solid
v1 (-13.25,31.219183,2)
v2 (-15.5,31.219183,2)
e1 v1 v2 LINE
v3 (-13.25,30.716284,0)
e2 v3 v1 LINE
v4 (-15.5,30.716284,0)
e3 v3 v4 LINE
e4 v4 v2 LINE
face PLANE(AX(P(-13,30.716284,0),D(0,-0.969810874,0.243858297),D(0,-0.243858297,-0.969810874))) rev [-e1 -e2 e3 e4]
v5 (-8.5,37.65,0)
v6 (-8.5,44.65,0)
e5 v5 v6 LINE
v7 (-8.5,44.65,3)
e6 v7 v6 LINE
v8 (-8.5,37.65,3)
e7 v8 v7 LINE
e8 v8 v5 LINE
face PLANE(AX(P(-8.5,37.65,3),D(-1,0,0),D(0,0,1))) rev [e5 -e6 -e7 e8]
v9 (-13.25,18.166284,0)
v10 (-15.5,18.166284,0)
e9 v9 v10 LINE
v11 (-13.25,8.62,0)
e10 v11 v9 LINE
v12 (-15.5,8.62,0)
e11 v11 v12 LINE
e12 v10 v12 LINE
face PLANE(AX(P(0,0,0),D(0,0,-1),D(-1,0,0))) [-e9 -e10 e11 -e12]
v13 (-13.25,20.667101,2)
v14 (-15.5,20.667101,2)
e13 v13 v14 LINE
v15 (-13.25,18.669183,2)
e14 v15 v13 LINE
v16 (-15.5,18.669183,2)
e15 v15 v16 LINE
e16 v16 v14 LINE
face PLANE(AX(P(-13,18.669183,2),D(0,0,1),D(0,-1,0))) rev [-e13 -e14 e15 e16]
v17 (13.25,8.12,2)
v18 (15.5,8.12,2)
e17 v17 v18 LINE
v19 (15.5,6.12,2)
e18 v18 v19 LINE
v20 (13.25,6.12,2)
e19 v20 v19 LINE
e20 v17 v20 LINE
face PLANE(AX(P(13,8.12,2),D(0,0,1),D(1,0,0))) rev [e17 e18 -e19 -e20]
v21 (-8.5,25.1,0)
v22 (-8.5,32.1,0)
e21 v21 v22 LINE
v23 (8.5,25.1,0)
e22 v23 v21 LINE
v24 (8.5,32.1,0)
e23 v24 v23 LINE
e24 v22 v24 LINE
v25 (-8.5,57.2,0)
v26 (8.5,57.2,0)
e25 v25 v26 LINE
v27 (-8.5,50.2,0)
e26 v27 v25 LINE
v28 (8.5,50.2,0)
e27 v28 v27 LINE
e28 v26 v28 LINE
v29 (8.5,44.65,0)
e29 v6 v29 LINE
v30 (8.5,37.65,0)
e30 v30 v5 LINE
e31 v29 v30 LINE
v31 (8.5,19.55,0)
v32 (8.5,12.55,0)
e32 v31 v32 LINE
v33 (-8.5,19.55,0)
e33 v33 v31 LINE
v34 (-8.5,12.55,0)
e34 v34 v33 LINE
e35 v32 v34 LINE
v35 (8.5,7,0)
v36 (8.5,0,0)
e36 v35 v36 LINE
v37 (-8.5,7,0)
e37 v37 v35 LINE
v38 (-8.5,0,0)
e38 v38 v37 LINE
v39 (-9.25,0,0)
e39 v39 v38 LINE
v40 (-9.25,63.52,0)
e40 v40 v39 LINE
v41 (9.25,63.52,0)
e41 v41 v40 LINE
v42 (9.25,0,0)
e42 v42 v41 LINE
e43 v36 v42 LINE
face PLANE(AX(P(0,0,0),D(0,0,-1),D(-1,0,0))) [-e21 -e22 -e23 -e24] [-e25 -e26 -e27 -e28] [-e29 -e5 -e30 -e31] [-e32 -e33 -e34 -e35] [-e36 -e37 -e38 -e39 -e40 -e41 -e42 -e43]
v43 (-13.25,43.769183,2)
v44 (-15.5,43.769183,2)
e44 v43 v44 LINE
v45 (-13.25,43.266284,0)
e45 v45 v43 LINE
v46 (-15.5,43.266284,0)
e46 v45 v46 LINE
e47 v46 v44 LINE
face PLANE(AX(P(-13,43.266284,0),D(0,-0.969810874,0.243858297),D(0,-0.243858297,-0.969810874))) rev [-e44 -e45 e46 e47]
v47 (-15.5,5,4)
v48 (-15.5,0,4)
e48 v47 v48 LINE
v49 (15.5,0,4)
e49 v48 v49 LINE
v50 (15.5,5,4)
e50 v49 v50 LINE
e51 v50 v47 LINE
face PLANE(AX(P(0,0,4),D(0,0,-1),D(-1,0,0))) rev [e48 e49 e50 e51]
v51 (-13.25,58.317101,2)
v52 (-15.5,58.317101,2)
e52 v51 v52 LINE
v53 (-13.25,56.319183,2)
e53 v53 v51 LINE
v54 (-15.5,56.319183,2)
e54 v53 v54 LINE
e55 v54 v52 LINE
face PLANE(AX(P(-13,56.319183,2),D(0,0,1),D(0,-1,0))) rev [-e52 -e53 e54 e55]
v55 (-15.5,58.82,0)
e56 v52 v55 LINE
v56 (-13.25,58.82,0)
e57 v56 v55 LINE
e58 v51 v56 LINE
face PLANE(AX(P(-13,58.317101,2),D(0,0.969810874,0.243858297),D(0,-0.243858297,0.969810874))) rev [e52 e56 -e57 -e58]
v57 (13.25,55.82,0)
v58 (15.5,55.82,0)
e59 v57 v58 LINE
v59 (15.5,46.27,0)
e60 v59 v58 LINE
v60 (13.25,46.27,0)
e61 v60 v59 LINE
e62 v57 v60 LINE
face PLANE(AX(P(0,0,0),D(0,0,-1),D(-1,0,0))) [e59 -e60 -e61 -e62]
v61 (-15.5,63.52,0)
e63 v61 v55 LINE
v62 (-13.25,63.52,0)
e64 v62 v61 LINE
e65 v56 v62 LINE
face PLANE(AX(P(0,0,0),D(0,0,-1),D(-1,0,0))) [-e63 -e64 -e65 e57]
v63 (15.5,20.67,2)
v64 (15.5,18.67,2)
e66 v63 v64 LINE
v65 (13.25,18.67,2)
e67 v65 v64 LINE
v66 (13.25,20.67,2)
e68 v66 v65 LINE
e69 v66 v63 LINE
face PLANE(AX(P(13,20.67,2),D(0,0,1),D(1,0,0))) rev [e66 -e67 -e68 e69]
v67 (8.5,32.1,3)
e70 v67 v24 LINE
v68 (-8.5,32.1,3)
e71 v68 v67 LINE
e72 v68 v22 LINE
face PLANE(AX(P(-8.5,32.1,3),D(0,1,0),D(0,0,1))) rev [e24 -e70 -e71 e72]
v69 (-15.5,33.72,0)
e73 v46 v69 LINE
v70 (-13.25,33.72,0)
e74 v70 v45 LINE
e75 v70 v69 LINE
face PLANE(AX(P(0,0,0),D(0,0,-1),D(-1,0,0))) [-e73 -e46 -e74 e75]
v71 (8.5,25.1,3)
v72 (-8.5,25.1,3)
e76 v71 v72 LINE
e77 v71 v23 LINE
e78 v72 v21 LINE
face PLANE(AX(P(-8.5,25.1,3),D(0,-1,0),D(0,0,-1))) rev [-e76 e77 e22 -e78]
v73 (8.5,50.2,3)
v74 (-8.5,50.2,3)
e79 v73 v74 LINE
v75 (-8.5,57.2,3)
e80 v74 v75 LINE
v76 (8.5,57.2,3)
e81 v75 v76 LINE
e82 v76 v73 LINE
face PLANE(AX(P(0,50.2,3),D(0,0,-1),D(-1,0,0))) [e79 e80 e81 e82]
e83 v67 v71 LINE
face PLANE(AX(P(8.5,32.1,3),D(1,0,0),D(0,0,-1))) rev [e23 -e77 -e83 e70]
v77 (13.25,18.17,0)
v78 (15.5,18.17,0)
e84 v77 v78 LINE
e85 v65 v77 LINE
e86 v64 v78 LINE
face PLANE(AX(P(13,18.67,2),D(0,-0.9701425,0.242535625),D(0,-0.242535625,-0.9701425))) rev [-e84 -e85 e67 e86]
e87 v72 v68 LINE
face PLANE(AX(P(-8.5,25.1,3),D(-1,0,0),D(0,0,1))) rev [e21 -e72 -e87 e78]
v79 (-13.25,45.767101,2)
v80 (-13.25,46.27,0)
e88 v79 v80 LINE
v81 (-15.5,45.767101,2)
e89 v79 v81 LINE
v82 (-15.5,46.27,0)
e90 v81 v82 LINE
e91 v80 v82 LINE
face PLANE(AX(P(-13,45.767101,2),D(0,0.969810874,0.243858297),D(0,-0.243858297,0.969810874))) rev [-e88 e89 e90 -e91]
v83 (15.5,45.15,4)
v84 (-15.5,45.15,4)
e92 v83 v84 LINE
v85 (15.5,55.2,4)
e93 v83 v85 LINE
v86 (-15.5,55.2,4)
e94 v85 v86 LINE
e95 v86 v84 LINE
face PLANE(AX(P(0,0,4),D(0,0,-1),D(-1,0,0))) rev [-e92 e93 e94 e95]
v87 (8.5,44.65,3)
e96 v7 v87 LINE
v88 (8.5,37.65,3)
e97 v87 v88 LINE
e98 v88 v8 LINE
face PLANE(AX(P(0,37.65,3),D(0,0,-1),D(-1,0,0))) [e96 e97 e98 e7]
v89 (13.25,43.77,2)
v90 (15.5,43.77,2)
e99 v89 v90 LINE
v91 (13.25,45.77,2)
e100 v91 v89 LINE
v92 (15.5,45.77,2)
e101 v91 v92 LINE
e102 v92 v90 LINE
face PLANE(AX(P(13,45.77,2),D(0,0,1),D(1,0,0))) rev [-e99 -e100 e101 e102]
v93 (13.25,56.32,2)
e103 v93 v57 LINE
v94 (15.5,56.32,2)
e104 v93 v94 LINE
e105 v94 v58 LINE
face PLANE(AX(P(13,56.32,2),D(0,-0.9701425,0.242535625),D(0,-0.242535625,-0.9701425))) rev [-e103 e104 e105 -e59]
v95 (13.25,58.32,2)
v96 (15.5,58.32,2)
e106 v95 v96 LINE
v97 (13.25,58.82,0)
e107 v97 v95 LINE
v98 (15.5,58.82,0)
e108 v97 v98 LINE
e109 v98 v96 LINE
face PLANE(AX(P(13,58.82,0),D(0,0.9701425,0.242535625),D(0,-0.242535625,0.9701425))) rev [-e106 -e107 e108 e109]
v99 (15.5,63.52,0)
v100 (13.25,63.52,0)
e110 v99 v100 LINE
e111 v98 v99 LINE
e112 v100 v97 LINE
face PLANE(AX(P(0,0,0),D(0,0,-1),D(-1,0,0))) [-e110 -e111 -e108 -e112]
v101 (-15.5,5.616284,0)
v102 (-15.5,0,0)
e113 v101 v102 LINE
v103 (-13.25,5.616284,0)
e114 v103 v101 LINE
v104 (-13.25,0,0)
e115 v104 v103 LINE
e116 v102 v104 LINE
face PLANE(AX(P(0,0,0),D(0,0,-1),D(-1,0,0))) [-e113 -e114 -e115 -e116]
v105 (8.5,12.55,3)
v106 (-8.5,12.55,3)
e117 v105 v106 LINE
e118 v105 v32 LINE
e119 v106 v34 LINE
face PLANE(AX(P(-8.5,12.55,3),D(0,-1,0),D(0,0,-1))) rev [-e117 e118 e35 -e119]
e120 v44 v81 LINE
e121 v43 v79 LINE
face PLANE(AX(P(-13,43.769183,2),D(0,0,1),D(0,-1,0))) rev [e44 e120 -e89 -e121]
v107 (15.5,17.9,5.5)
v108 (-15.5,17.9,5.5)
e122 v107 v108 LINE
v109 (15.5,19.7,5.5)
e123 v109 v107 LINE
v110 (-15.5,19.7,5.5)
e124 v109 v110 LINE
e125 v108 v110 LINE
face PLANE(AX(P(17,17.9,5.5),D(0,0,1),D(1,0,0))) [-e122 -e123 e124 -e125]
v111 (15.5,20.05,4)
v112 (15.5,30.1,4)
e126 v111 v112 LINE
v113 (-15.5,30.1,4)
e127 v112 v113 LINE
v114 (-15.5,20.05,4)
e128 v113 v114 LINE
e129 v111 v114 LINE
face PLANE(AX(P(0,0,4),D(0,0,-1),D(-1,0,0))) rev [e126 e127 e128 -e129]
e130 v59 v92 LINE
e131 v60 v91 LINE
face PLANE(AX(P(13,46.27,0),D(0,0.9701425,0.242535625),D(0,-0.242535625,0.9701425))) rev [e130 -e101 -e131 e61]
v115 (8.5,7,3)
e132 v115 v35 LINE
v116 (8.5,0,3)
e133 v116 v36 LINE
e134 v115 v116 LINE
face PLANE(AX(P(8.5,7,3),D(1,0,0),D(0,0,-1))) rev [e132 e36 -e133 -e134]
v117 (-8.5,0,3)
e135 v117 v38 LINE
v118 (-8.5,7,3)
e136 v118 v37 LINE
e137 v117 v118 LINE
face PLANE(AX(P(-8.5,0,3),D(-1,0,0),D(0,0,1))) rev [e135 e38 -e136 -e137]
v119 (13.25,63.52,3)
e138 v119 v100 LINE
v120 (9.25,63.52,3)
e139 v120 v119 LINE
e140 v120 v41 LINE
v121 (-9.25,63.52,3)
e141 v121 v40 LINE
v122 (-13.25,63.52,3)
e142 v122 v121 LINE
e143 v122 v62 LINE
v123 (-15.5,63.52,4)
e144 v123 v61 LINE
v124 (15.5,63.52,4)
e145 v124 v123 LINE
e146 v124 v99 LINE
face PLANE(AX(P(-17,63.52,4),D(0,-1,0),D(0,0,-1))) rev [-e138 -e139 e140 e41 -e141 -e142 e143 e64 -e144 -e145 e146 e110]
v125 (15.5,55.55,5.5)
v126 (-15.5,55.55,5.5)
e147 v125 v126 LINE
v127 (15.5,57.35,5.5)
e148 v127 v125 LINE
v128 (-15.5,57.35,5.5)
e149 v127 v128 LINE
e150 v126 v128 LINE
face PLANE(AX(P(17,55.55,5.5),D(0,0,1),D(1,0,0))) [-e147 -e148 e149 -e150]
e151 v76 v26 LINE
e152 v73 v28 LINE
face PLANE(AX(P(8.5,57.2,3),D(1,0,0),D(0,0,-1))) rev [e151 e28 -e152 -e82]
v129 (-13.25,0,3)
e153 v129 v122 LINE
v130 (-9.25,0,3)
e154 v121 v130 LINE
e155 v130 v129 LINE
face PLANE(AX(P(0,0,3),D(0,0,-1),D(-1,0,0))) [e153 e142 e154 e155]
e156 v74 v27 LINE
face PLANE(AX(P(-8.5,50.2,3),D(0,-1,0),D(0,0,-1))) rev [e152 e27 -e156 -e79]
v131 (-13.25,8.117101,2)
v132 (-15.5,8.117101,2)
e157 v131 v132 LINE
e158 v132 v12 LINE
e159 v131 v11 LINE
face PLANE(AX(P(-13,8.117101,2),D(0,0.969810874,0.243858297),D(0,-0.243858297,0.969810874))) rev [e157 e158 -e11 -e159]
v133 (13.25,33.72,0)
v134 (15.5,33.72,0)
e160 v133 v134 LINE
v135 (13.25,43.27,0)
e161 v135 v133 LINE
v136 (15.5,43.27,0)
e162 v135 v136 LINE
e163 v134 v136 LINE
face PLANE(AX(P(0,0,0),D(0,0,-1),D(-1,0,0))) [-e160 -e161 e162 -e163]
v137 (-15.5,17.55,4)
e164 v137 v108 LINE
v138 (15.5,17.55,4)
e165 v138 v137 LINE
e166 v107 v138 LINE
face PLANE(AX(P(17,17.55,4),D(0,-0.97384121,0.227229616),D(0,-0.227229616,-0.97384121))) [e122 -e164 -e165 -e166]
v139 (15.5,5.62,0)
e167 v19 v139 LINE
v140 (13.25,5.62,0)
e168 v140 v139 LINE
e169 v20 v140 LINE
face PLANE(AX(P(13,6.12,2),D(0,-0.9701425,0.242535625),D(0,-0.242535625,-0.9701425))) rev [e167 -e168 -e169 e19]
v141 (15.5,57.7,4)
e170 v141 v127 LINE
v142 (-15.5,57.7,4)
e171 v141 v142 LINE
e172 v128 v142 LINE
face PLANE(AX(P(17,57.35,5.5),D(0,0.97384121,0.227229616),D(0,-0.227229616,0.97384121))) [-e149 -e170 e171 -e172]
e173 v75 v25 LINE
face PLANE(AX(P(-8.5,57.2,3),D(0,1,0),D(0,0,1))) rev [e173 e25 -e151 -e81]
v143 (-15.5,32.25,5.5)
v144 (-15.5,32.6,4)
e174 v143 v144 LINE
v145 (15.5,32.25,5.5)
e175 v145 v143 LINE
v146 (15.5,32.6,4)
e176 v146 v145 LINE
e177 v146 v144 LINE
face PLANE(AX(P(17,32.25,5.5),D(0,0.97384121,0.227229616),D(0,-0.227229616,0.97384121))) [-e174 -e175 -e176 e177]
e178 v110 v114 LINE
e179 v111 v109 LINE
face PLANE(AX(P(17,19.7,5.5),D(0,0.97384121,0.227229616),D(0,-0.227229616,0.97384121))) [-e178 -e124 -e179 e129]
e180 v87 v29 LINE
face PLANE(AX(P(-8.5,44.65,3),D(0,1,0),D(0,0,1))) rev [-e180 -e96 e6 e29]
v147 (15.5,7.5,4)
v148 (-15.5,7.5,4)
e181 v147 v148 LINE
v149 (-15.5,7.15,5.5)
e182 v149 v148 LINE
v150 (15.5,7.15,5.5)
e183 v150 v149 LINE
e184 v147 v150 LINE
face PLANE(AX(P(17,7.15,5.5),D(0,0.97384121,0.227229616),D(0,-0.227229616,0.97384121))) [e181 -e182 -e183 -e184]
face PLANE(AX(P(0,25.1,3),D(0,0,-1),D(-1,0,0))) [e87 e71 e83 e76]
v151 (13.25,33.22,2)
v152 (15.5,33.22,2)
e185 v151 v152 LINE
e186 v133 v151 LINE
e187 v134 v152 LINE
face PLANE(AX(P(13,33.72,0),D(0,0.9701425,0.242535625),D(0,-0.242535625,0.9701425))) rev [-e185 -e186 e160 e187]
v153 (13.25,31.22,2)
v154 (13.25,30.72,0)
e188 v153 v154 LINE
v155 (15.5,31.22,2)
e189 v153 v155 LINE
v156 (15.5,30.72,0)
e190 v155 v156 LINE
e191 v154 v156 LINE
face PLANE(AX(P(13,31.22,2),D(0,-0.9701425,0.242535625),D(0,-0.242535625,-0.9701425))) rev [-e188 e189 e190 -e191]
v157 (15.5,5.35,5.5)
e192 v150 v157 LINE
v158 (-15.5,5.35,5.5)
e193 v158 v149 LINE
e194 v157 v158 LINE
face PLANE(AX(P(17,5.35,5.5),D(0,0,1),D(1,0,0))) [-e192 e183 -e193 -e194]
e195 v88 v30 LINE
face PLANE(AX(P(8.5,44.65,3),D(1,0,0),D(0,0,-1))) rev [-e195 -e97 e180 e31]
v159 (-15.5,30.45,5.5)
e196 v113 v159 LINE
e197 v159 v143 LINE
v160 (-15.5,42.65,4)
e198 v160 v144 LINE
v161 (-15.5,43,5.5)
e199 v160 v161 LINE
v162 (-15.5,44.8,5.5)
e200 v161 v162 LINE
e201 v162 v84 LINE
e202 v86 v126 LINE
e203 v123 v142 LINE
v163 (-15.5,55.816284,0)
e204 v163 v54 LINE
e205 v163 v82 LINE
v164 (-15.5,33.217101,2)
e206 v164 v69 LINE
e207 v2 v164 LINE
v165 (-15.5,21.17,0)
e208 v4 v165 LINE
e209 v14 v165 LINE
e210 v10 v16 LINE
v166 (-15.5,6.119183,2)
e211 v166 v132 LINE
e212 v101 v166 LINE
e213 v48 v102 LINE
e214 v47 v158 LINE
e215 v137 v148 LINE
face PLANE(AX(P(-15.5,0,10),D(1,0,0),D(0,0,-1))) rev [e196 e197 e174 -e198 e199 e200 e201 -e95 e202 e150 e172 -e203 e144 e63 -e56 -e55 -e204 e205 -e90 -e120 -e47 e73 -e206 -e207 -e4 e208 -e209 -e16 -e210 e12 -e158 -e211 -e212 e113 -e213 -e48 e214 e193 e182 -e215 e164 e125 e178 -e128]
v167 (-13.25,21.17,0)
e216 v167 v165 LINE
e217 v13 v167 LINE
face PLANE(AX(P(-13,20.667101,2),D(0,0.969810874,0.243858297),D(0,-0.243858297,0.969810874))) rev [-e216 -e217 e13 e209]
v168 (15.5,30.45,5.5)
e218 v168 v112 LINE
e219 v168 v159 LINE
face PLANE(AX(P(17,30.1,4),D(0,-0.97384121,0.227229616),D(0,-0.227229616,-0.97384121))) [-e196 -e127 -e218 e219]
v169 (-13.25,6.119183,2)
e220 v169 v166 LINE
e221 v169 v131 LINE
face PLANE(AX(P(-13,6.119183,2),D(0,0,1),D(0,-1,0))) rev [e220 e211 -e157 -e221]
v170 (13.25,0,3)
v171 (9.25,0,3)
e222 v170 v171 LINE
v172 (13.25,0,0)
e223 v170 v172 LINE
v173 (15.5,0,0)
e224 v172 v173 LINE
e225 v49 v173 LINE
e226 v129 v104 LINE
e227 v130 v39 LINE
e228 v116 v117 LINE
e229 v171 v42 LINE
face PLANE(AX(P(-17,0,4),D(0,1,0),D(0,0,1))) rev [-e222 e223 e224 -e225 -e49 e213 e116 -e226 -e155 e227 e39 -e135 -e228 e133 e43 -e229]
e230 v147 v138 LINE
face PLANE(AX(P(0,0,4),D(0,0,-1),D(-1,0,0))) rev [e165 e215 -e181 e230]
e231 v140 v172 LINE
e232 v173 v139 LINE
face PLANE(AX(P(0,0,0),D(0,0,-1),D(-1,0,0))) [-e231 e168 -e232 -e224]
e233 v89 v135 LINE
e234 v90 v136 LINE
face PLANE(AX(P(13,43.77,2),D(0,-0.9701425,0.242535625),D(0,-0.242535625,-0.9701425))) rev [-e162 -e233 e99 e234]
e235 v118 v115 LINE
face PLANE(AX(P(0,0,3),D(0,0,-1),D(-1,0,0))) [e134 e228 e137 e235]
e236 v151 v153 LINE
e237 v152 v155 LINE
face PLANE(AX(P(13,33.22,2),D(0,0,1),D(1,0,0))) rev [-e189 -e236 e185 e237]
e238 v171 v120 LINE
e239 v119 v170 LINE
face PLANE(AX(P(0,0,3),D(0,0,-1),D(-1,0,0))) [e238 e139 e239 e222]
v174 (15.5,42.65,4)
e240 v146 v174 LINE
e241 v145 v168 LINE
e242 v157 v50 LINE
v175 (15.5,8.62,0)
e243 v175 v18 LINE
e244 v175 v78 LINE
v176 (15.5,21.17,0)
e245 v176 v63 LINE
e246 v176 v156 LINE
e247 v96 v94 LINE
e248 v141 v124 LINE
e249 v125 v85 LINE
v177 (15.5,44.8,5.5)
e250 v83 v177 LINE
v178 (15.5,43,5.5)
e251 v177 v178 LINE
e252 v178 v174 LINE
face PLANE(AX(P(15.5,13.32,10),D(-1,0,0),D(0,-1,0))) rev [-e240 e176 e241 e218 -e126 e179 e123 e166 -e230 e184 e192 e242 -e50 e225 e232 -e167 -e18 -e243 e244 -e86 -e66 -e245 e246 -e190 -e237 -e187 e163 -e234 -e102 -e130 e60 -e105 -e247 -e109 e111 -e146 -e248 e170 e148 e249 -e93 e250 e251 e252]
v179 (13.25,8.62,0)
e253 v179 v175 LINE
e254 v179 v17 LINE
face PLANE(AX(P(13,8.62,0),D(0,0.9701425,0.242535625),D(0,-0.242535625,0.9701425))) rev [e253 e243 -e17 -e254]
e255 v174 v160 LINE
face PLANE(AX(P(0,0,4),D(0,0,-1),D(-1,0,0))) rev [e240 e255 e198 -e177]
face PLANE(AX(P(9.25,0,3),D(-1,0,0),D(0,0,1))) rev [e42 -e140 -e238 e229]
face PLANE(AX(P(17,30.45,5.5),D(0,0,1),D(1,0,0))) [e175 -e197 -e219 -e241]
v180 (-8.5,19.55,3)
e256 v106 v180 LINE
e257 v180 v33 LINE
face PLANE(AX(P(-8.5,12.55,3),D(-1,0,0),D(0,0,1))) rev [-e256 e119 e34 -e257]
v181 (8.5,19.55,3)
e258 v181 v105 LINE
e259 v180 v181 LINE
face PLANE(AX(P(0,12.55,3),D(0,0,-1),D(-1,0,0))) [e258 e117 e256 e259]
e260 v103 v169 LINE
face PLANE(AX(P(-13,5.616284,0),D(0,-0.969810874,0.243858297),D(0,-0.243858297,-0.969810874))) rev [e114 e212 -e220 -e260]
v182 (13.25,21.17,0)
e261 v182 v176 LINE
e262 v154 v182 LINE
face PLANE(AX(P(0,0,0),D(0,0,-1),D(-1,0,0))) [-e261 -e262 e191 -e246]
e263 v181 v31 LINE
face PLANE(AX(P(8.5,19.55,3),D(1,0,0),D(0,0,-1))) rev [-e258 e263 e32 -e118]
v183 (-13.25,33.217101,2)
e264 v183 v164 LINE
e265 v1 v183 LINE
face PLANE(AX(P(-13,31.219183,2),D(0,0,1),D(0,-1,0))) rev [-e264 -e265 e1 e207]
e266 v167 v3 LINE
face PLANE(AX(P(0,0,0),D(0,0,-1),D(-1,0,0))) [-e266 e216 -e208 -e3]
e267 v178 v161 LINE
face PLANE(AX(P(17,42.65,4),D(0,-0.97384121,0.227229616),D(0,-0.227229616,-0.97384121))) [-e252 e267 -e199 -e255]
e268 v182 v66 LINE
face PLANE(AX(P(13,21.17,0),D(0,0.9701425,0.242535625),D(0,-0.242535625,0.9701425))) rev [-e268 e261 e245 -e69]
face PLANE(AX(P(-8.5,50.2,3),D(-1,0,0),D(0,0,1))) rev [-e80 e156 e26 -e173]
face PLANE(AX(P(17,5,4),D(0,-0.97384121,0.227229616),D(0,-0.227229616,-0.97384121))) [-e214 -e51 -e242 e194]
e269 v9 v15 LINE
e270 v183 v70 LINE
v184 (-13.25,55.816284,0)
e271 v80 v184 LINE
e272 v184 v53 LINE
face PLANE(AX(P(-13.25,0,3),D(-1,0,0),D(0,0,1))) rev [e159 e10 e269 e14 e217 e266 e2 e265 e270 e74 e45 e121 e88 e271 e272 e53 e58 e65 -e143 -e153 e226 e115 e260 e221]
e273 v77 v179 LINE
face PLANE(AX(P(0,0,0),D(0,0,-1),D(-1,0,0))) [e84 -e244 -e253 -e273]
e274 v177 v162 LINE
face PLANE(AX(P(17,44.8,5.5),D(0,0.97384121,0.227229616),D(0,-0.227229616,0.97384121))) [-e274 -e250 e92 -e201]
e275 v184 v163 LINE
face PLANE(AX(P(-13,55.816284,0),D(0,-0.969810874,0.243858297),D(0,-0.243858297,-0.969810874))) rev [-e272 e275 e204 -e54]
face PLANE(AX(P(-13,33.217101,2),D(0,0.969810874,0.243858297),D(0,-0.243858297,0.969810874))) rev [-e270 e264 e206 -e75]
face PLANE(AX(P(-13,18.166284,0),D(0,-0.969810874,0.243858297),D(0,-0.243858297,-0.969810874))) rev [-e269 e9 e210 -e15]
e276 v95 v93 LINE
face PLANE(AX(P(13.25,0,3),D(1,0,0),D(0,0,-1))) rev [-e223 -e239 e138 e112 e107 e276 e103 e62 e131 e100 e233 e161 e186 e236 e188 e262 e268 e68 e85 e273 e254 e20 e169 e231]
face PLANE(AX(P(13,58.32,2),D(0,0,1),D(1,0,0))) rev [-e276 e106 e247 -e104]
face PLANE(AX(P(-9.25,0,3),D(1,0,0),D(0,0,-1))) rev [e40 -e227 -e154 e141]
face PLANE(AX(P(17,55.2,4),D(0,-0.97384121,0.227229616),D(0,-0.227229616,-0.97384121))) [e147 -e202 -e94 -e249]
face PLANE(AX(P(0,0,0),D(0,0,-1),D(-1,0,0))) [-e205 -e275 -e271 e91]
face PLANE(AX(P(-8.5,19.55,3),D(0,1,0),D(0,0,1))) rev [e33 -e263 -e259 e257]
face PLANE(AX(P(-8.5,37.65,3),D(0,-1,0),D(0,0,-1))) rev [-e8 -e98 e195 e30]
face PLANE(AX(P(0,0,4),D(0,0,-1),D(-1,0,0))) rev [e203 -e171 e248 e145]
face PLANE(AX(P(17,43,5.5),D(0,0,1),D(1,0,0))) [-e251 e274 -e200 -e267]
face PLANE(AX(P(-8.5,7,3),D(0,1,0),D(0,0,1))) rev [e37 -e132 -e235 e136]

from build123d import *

# Parameters (mm, degrees)
SKETCH2_W                  = 34
SKETCH2_H                  = 13.32
BOSS_EXTRUDE1_DEPTH        = 4
SKETCH3_W                  = 17
SKETCH3_H                  = 7
CUT_EXTRUDE1_DEPTH         = 3
SKETCH4_W                  = 4
SKETCH4_H                  = 13.32
CUT_EXTRUDE3_DEPTH         = 3
CUT_EXTRUDE4_DEPTH         = 4
CUT_EXTRUDE5_DEPTH         = 4
BOSS_EXTRUDE2_DEPTH        = 34
SKETCH9_W                  = 1.5
SKETCH9_H                  = 13.32
CUT_EXTRUDE6_DEPTH         = 10
CRVPATTERN11_START         = -8.5
CRVPATTERN11_OUTLINE_W     = 0.77
CRVPATTERN11_OUTLINE_H     = 3
CRVPATTERN11_DEPTH         = 17
CRVPATTERN11_START_2       = -9.25
CRVPATTERN11_2_DEPTH       = 18.5
CRVPATTERN11_START_3       = -15.5
CRVPATTERN11_3_DEPTH       = 31
CRVPATTERN11_START_4       = 13.25
CRVPATTERN11_4_DEPTH       = 2.25
CRVPATTERN11_5_DEPTH       = 2.25
CRVPATTERN11_6_OUTLINE_W   = 7
CRVPATTERN11_6_OUTLINE_H   = 3
CRVPATTERN11_6_OUTLINE_W_2 = 6.23
CRVPATTERN11_6_DEPTH       = 0.75
CRVPATTERN11_START_5       = 8.5
CRVPATTERN11_7_OUTLINE_W   = 7
CRVPATTERN11_7_OUTLINE_H   = 3
CRVPATTERN11_7_OUTLINE_W_2 = 6.23
CRVPATTERN11_7_DEPTH       = 0.75


with BuildPart() as part:
    # Sketch2 → Boss-Extrude1 (new body)
    with BuildSketch(Plane.XY):
        with Locations((0, 6.66)):
            Rectangle(SKETCH2_W, SKETCH2_H)
    extrude(amount=BOSS_EXTRUDE1_DEPTH)

    # Sketch3 → Cut-Extrude1 (cut)
    with BuildSketch(Plane(origin=(0, 0, 0), x_dir=(-1, 0, 0), z_dir=(0, 0, -1))):
        with Locations((0, 3.5)):
            Rectangle(SKETCH3_W, SKETCH3_H)
    extrude(amount=-CUT_EXTRUDE1_DEPTH, mode=Mode.SUBTRACT)

    # Sketch4 → Cut-Extrude3 (cut)
    with BuildSketch(Plane(origin=(0, 0, 0), x_dir=(-1, 0, 0), z_dir=(0, 0, -1))):
        with Locations((-11.25, 6.66)):
            Rectangle(SKETCH4_W, SKETCH4_H)
        with Locations((11.25, 6.66)):
            Rectangle(SKETCH4_W, SKETCH4_H)
    extrude(amount=-CUT_EXTRUDE3_DEPTH, mode=Mode.SUBTRACT)

    # Sketch6 → Cut-Extrude4 (cut)
    with BuildSketch(Plane(origin=(17, 0, 0), x_dir=(0, 0, -1), z_dir=(1, 0, 0))):
        Polygon((0, 8.62), (0, 5.62), (-2, 6.12), (-2, 8.12), align=None)
    extrude(amount=-CUT_EXTRUDE4_DEPTH, mode=Mode.SUBTRACT)

    # Sketch7 → Cut-Extrude5 (cut)
    with BuildSketch(Plane.ZY.offset(17)):
        Polygon((0, 5.616283946), (0, 8.62), (2, 8.117101335), (2, 6.119182611), align=None)
    extrude(amount=-CUT_EXTRUDE5_DEPTH, mode=Mode.SUBTRACT)

    # Sketch8 → Boss-Extrude2 (add)
    with BuildSketch(Plane.ZY.offset(17)):
        Polygon((4, 5), (4, 7.5), (5.5, 7.15), (5.5, 5.35), align=None)
    extrude(amount=-BOSS_EXTRUDE2_DEPTH)

    # Sketch9 → Cut-Extrude6 (cut)
    with BuildSketch(Plane(origin=(0, 0, 0), x_dir=(-1, 0, 0), z_dir=(0, 0, -1))):
        with Locations((-16.25, 6.66)):
            Rectangle(SKETCH9_W, SKETCH9_H)
        with Locations((16.25, 6.66)):
            Rectangle(SKETCH9_W, SKETCH9_H)
    extrude(amount=-CUT_EXTRUDE6_DEPTH, mode=Mode.SUBTRACT)

    # CrvPattern11: read off the stored shape, not the designer's step
    # CrvPattern11 outline → CrvPattern11 (cut)
    with BuildSketch(Plane.YZ.offset(CRVPATTERN11_START)):
        with Locations((12.935, 1.5)):
            Rectangle(CRVPATTERN11_OUTLINE_W, CRVPATTERN11_OUTLINE_H)
    extrude(amount=CRVPATTERN11_DEPTH, mode=Mode.SUBTRACT)

    # CrvPattern11 2 outline → CrvPattern11 2 (add)
    with BuildSketch(Plane.YZ.offset(CRVPATTERN11_START_2)):
        Polygon((55.2, 4), (45.15, 4), (44.8, 5.5), (43, 5.5), (42.65, 4), (32.6, 4), (32.25, 5.5), (30.45, 5.5), (30.1, 4), (20.05, 4), (19.7, 5.5), (17.9, 5.5), (17.55, 4), (13.32, 4), (13.32, 3), (19.55, 3), (19.55, 0), (25.1, 0), (25.1, 3), (32.1, 3), (32.1, 0), (37.65, 0), (37.65, 3), (44.65, 3), (44.65, 0), (50.2, 0), (50.2, 3), (57.2, 3), (57.2, 0), (63.52, 0), (63.52, 4), (57.7, 4), (57.35, 5.5), (55.55, 5.5), align=None)
    extrude(amount=CRVPATTERN11_2_DEPTH)

    # CrvPattern11 3 outline → CrvPattern11 3 (add)
    with BuildSketch(Plane.YZ.offset(CRVPATTERN11_START_3)):
        Polygon((55.2, 4), (45.15, 4), (44.8, 5.5), (43, 5.5), (42.65, 4), (32.6, 4), (32.25, 5.5), (30.45, 5.5), (30.1, 4), (20.05, 4), (19.7, 5.5), (17.9, 5.5), (17.55, 4), (13.32, 4), (13.32, 3), (63.52, 3), (63.52, 4), (57.7, 4), (57.35, 5.5), (55.55, 5.5), align=None)
    extrude(amount=CRVPATTERN11_3_DEPTH)

    # CrvPattern11 4 outline → CrvPattern11 4 (add)
    with BuildSketch(Plane.YZ.offset(CRVPATTERN11_START_4)):
        Polygon((63.52, 0), (63.52, 3), (13.32, 3), (13.32, 0), (18.17, 0), (18.67, 2), (20.67, 2), (21.17, 0), (30.72, 0), (31.22, 2), (33.22, 2), (33.72, 0), (43.27, 0), (43.77, 2), (45.77, 2), (46.27, 0), (55.82, 0), (56.32, 2), (58.32, 2), (58.82, 0), align=None)
    extrude(amount=CRVPATTERN11_4_DEPTH)

    # CrvPattern11 5 outline → CrvPattern11 5 (add)
    with BuildSketch(Plane.YZ.offset(CRVPATTERN11_START_3)):
        Polygon((63.52, 0), (63.52, 3), (13.32, 3), (13.32, 0), (18.166283946, 0), (18.669182611, 2), (20.667101335, 2), (21.17, 0), (30.716283946, 0), (31.219182611, 2), (33.217101335, 2), (33.72, 0), (43.266283946, 0), (43.769182611, 2), (45.767101335, 2), (46.27, 0), (55.816283946, 0), (56.319182611, 2), (58.317101335, 2), (58.82, 0), align=None)
    extrude(amount=CRVPATTERN11_5_DEPTH)

    # CrvPattern11 6 outline → CrvPattern11 6 (add)
    with BuildSketch(Plane.YZ.offset(CRVPATTERN11_START_2)):
        with Locations((53.7, 1.5)):
            Rectangle(CRVPATTERN11_6_OUTLINE_W, CRVPATTERN11_6_OUTLINE_H)
        with Locations((41.15, 1.5)):
            Rectangle(CRVPATTERN11_6_OUTLINE_W, CRVPATTERN11_6_OUTLINE_H)
        with Locations((28.6, 1.5)):
            Rectangle(CRVPATTERN11_6_OUTLINE_W, CRVPATTERN11_6_OUTLINE_H)
        with Locations((16.435, 1.5)):
            Rectangle(CRVPATTERN11_6_OUTLINE_W_2, CRVPATTERN11_6_OUTLINE_H)
    extrude(amount=CRVPATTERN11_6_DEPTH)

    # CrvPattern11 7 outline → CrvPattern11 7 (add)
    with BuildSketch(Plane.YZ.offset(CRVPATTERN11_START_5)):
        with Locations((53.7, 1.5)):
            Rectangle(CRVPATTERN11_7_OUTLINE_W, CRVPATTERN11_7_OUTLINE_H)
        with Locations((41.15, 1.5)):
            Rectangle(CRVPATTERN11_7_OUTLINE_W, CRVPATTERN11_7_OUTLINE_H)
        with Locations((28.6, 1.5)):
            Rectangle(CRVPATTERN11_7_OUTLINE_W, CRVPATTERN11_7_OUTLINE_H)
        with Locations((16.435, 1.5)):
            Rectangle(CRVPATTERN11_7_OUTLINE_W_2, CRVPATTERN11_7_OUTLINE_H)
    extrude(amount=CRVPATTERN11_7_DEPTH)


solid = part.part
